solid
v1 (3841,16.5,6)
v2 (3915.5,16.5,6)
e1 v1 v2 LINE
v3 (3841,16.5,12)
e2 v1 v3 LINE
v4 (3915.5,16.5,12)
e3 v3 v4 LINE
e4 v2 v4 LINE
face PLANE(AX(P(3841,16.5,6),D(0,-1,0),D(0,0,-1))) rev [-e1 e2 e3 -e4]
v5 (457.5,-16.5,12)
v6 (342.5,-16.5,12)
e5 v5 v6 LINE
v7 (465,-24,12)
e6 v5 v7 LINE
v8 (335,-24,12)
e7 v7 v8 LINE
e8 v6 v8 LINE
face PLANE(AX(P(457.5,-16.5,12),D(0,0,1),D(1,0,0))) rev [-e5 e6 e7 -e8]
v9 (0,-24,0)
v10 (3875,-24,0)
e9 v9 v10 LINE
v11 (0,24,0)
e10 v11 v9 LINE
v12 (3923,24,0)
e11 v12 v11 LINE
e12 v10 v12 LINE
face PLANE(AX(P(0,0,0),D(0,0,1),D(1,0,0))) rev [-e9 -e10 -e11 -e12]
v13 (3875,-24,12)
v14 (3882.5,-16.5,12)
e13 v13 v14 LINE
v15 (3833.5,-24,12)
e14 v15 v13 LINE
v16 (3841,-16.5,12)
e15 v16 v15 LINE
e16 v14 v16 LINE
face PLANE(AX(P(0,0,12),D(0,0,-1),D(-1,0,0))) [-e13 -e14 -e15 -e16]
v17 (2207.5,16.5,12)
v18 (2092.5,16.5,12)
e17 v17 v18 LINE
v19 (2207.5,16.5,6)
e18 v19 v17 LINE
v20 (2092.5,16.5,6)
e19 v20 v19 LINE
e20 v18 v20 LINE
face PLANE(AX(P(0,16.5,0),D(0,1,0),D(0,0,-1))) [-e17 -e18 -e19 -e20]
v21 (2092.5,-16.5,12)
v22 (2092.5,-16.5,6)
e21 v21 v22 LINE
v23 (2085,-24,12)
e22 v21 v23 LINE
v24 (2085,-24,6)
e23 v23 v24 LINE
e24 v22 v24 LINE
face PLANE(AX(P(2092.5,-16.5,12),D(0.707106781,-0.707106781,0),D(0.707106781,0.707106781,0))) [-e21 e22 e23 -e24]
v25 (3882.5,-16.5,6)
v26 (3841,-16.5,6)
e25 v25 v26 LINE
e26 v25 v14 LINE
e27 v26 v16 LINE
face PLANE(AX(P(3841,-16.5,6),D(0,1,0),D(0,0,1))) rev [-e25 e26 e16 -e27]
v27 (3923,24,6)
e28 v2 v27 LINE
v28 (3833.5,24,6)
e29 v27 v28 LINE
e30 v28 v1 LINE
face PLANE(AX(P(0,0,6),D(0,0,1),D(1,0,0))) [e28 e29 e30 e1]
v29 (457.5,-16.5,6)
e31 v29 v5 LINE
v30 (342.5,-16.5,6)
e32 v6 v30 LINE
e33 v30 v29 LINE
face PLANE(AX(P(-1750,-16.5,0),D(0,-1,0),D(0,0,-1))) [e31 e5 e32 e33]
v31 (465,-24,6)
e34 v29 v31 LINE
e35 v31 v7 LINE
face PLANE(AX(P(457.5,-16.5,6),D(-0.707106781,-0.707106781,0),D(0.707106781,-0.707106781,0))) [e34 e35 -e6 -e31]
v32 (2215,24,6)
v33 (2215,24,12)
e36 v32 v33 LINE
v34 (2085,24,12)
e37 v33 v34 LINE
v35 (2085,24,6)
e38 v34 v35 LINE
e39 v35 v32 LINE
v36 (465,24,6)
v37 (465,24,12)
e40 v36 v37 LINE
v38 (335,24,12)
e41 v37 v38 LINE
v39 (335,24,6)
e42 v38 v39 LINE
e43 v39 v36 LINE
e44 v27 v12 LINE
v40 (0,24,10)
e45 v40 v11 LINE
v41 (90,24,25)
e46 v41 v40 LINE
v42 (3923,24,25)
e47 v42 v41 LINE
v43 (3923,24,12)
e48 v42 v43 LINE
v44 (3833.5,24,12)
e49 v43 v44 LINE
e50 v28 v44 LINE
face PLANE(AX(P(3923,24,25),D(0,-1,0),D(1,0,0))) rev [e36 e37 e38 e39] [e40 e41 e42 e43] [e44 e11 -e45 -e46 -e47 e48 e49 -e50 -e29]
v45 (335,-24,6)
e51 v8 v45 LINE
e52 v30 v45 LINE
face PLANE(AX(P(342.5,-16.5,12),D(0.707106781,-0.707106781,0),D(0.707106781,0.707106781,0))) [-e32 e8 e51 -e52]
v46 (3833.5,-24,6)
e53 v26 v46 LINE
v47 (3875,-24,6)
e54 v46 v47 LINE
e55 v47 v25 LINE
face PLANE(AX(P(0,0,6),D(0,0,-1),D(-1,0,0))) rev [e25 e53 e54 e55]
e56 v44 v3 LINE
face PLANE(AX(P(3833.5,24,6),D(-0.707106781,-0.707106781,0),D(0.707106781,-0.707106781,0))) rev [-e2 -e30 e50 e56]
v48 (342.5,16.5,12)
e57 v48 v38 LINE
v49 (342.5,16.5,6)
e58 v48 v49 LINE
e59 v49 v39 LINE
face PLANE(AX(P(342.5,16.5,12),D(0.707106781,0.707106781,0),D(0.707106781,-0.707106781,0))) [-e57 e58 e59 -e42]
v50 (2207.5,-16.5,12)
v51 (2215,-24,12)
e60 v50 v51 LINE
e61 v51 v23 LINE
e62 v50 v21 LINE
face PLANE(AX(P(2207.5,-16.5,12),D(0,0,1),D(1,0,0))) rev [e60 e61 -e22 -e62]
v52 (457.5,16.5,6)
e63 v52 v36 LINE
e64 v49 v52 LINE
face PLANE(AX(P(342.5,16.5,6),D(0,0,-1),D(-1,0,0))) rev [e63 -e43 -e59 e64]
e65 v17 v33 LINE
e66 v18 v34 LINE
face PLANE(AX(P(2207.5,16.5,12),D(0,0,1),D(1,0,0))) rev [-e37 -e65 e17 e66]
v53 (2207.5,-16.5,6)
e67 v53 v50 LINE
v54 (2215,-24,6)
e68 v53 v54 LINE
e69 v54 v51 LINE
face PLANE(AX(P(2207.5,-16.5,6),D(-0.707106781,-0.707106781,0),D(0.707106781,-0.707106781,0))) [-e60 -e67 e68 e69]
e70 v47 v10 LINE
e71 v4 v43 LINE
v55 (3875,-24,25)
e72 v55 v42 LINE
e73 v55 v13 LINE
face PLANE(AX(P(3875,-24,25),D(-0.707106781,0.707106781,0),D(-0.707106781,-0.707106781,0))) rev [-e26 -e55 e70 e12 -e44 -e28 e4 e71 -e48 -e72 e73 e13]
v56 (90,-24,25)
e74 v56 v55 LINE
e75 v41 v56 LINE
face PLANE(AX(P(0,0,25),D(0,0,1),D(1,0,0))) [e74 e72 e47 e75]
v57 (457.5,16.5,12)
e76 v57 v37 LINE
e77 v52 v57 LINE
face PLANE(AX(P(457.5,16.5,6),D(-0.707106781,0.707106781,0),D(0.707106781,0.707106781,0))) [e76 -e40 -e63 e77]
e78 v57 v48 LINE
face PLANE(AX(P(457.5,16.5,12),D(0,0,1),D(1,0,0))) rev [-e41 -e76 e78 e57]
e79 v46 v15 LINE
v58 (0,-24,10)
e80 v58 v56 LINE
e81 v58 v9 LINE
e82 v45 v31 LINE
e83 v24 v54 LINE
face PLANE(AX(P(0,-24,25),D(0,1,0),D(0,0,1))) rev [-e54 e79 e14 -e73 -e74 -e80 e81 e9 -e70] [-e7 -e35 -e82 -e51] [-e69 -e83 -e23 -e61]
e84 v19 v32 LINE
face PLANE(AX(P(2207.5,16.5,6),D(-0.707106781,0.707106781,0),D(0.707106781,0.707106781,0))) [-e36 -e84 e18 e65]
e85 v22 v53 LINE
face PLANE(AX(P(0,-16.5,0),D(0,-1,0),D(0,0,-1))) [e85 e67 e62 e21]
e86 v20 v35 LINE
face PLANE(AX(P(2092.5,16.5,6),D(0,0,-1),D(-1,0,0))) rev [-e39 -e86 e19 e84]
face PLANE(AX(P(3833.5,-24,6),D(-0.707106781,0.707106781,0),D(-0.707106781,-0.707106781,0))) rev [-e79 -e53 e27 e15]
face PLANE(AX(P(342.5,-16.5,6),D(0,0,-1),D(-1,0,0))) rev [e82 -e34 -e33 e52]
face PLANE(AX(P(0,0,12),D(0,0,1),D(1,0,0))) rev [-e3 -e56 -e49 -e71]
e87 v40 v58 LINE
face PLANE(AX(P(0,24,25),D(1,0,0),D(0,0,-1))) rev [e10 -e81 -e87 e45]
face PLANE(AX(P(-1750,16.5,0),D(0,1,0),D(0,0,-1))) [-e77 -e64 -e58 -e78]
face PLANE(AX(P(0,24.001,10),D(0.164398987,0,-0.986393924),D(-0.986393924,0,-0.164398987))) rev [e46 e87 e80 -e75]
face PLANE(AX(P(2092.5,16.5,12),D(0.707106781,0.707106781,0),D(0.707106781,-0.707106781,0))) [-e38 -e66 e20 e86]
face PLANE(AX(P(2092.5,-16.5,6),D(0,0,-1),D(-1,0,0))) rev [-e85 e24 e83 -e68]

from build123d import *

# Parameters (mm, degrees)
EXTRUDE_1_DEPTH        = 25
SKETCH_2_W             = 115
SKETCH_2_H             = 6
CUT_EXTRUDE_1_DEPTH    = 7.5
DRAFT_1_ANGLE          = 45
MIRROR_START           = 6
MIRROR_1_DEPTH         = 6
PATTERN_START          = 6
PATTERN_LINEAR_1_DEPTH = 6
CUT_EXTRUDE_START      = -13
CUT_EXTRUDE_2_DEPTH    = 6
CUT_EXTRUDE_3_REACH    = 3925.373


# Read off the part's stored shape, not the designer's step: 镜向1, 阵列(线性)1
with BuildPart() as part:
    # 草图1 → 凸台-拉伸1 (new body)
    with BuildSketch(Plane.XY):
        Polygon((0, 24), (0, -24), (3875, -24), (3923, 24), align=None)
    extrude(amount=EXTRUDE_1_DEPTH)

    # 草图2 → 切除-拉伸1 (cut)
    with BuildSketch(Plane.XZ.offset(24)):
        with Locations((2150, 9)):
            Rectangle(SKETCH_2_W, SKETCH_2_H)
    extrude(amount=-CUT_EXTRUDE_1_DEPTH, mode=Mode.SUBTRACT)

    # 拔模1
    draft_1_faces = [part.faces().sort_by_distance(p)[0] for p in [
        (2207.5, -20.25, 9),
        (2092.5, -20.25, 9),
    ]]
    draft(draft_1_faces, Plane(origin=(0, -16.5, 0), x_dir=(0, 0, -1), z_dir=(0, -1, 0)), DRAFT_1_ANGLE)

    # 镜向1 outline → 镜向1 (cut)
    with BuildSketch(Plane.XY.offset(MIRROR_START)):
        Polygon((2092.5, 16.5), (2207.5, 16.5), (2215, 24), (2085, 24), align=None)
    extrude(amount=MIRROR_1_DEPTH, mode=Mode.SUBTRACT)

    # 阵列(线性)1 outline → 阵列(线性)1 (cut)
    with BuildSketch(Plane.XY.offset(PATTERN_START)):
        Polygon((457.5, 16.5), (465, 24), (335, 24), (342.5, 16.5), align=None)
        Polygon((465, -24), (457.5, -16.5), (342.5, -16.5), (335, -24), align=None)
    extrude(amount=PATTERN_LINEAR_1_DEPTH, mode=Mode.SUBTRACT)

    # 草图4 → 切除-拉伸2 (cut)
    with BuildSketch(Plane.XY.offset(25).offset(CUT_EXTRUDE_START)):
        Polygon((3833.5, 24), (3841, 16.5), (3915.5, 16.5), (3923, 24), align=None)
        Polygon((3833.5, -24), (3841, -16.5), (3882.5, -16.5), (3875, -24), align=None)
    extrude(amount=-CUT_EXTRUDE_2_DEPTH, mode=Mode.SUBTRACT)

    # 草图5 → 切除-拉伸3 (cut, up to next)
    with BuildSketch(Plane.XZ.offset(24), mode=Mode.PRIVATE) as cut_extrude_3_sk1:
        Polygon((0, 10), (90, 25), (0, 25), align=None)
    cut_extrude_3_tool1 = extrude(cut_extrude_3_sk1.sketch, amount=-CUT_EXTRUDE_3_REACH, mode=Mode.PRIVATE) & part.part
    add(cut_extrude_3_tool1.solids().sort_by_distance((30, -24, 20))[0], mode=Mode.SUBTRACT)


solid = part.part
